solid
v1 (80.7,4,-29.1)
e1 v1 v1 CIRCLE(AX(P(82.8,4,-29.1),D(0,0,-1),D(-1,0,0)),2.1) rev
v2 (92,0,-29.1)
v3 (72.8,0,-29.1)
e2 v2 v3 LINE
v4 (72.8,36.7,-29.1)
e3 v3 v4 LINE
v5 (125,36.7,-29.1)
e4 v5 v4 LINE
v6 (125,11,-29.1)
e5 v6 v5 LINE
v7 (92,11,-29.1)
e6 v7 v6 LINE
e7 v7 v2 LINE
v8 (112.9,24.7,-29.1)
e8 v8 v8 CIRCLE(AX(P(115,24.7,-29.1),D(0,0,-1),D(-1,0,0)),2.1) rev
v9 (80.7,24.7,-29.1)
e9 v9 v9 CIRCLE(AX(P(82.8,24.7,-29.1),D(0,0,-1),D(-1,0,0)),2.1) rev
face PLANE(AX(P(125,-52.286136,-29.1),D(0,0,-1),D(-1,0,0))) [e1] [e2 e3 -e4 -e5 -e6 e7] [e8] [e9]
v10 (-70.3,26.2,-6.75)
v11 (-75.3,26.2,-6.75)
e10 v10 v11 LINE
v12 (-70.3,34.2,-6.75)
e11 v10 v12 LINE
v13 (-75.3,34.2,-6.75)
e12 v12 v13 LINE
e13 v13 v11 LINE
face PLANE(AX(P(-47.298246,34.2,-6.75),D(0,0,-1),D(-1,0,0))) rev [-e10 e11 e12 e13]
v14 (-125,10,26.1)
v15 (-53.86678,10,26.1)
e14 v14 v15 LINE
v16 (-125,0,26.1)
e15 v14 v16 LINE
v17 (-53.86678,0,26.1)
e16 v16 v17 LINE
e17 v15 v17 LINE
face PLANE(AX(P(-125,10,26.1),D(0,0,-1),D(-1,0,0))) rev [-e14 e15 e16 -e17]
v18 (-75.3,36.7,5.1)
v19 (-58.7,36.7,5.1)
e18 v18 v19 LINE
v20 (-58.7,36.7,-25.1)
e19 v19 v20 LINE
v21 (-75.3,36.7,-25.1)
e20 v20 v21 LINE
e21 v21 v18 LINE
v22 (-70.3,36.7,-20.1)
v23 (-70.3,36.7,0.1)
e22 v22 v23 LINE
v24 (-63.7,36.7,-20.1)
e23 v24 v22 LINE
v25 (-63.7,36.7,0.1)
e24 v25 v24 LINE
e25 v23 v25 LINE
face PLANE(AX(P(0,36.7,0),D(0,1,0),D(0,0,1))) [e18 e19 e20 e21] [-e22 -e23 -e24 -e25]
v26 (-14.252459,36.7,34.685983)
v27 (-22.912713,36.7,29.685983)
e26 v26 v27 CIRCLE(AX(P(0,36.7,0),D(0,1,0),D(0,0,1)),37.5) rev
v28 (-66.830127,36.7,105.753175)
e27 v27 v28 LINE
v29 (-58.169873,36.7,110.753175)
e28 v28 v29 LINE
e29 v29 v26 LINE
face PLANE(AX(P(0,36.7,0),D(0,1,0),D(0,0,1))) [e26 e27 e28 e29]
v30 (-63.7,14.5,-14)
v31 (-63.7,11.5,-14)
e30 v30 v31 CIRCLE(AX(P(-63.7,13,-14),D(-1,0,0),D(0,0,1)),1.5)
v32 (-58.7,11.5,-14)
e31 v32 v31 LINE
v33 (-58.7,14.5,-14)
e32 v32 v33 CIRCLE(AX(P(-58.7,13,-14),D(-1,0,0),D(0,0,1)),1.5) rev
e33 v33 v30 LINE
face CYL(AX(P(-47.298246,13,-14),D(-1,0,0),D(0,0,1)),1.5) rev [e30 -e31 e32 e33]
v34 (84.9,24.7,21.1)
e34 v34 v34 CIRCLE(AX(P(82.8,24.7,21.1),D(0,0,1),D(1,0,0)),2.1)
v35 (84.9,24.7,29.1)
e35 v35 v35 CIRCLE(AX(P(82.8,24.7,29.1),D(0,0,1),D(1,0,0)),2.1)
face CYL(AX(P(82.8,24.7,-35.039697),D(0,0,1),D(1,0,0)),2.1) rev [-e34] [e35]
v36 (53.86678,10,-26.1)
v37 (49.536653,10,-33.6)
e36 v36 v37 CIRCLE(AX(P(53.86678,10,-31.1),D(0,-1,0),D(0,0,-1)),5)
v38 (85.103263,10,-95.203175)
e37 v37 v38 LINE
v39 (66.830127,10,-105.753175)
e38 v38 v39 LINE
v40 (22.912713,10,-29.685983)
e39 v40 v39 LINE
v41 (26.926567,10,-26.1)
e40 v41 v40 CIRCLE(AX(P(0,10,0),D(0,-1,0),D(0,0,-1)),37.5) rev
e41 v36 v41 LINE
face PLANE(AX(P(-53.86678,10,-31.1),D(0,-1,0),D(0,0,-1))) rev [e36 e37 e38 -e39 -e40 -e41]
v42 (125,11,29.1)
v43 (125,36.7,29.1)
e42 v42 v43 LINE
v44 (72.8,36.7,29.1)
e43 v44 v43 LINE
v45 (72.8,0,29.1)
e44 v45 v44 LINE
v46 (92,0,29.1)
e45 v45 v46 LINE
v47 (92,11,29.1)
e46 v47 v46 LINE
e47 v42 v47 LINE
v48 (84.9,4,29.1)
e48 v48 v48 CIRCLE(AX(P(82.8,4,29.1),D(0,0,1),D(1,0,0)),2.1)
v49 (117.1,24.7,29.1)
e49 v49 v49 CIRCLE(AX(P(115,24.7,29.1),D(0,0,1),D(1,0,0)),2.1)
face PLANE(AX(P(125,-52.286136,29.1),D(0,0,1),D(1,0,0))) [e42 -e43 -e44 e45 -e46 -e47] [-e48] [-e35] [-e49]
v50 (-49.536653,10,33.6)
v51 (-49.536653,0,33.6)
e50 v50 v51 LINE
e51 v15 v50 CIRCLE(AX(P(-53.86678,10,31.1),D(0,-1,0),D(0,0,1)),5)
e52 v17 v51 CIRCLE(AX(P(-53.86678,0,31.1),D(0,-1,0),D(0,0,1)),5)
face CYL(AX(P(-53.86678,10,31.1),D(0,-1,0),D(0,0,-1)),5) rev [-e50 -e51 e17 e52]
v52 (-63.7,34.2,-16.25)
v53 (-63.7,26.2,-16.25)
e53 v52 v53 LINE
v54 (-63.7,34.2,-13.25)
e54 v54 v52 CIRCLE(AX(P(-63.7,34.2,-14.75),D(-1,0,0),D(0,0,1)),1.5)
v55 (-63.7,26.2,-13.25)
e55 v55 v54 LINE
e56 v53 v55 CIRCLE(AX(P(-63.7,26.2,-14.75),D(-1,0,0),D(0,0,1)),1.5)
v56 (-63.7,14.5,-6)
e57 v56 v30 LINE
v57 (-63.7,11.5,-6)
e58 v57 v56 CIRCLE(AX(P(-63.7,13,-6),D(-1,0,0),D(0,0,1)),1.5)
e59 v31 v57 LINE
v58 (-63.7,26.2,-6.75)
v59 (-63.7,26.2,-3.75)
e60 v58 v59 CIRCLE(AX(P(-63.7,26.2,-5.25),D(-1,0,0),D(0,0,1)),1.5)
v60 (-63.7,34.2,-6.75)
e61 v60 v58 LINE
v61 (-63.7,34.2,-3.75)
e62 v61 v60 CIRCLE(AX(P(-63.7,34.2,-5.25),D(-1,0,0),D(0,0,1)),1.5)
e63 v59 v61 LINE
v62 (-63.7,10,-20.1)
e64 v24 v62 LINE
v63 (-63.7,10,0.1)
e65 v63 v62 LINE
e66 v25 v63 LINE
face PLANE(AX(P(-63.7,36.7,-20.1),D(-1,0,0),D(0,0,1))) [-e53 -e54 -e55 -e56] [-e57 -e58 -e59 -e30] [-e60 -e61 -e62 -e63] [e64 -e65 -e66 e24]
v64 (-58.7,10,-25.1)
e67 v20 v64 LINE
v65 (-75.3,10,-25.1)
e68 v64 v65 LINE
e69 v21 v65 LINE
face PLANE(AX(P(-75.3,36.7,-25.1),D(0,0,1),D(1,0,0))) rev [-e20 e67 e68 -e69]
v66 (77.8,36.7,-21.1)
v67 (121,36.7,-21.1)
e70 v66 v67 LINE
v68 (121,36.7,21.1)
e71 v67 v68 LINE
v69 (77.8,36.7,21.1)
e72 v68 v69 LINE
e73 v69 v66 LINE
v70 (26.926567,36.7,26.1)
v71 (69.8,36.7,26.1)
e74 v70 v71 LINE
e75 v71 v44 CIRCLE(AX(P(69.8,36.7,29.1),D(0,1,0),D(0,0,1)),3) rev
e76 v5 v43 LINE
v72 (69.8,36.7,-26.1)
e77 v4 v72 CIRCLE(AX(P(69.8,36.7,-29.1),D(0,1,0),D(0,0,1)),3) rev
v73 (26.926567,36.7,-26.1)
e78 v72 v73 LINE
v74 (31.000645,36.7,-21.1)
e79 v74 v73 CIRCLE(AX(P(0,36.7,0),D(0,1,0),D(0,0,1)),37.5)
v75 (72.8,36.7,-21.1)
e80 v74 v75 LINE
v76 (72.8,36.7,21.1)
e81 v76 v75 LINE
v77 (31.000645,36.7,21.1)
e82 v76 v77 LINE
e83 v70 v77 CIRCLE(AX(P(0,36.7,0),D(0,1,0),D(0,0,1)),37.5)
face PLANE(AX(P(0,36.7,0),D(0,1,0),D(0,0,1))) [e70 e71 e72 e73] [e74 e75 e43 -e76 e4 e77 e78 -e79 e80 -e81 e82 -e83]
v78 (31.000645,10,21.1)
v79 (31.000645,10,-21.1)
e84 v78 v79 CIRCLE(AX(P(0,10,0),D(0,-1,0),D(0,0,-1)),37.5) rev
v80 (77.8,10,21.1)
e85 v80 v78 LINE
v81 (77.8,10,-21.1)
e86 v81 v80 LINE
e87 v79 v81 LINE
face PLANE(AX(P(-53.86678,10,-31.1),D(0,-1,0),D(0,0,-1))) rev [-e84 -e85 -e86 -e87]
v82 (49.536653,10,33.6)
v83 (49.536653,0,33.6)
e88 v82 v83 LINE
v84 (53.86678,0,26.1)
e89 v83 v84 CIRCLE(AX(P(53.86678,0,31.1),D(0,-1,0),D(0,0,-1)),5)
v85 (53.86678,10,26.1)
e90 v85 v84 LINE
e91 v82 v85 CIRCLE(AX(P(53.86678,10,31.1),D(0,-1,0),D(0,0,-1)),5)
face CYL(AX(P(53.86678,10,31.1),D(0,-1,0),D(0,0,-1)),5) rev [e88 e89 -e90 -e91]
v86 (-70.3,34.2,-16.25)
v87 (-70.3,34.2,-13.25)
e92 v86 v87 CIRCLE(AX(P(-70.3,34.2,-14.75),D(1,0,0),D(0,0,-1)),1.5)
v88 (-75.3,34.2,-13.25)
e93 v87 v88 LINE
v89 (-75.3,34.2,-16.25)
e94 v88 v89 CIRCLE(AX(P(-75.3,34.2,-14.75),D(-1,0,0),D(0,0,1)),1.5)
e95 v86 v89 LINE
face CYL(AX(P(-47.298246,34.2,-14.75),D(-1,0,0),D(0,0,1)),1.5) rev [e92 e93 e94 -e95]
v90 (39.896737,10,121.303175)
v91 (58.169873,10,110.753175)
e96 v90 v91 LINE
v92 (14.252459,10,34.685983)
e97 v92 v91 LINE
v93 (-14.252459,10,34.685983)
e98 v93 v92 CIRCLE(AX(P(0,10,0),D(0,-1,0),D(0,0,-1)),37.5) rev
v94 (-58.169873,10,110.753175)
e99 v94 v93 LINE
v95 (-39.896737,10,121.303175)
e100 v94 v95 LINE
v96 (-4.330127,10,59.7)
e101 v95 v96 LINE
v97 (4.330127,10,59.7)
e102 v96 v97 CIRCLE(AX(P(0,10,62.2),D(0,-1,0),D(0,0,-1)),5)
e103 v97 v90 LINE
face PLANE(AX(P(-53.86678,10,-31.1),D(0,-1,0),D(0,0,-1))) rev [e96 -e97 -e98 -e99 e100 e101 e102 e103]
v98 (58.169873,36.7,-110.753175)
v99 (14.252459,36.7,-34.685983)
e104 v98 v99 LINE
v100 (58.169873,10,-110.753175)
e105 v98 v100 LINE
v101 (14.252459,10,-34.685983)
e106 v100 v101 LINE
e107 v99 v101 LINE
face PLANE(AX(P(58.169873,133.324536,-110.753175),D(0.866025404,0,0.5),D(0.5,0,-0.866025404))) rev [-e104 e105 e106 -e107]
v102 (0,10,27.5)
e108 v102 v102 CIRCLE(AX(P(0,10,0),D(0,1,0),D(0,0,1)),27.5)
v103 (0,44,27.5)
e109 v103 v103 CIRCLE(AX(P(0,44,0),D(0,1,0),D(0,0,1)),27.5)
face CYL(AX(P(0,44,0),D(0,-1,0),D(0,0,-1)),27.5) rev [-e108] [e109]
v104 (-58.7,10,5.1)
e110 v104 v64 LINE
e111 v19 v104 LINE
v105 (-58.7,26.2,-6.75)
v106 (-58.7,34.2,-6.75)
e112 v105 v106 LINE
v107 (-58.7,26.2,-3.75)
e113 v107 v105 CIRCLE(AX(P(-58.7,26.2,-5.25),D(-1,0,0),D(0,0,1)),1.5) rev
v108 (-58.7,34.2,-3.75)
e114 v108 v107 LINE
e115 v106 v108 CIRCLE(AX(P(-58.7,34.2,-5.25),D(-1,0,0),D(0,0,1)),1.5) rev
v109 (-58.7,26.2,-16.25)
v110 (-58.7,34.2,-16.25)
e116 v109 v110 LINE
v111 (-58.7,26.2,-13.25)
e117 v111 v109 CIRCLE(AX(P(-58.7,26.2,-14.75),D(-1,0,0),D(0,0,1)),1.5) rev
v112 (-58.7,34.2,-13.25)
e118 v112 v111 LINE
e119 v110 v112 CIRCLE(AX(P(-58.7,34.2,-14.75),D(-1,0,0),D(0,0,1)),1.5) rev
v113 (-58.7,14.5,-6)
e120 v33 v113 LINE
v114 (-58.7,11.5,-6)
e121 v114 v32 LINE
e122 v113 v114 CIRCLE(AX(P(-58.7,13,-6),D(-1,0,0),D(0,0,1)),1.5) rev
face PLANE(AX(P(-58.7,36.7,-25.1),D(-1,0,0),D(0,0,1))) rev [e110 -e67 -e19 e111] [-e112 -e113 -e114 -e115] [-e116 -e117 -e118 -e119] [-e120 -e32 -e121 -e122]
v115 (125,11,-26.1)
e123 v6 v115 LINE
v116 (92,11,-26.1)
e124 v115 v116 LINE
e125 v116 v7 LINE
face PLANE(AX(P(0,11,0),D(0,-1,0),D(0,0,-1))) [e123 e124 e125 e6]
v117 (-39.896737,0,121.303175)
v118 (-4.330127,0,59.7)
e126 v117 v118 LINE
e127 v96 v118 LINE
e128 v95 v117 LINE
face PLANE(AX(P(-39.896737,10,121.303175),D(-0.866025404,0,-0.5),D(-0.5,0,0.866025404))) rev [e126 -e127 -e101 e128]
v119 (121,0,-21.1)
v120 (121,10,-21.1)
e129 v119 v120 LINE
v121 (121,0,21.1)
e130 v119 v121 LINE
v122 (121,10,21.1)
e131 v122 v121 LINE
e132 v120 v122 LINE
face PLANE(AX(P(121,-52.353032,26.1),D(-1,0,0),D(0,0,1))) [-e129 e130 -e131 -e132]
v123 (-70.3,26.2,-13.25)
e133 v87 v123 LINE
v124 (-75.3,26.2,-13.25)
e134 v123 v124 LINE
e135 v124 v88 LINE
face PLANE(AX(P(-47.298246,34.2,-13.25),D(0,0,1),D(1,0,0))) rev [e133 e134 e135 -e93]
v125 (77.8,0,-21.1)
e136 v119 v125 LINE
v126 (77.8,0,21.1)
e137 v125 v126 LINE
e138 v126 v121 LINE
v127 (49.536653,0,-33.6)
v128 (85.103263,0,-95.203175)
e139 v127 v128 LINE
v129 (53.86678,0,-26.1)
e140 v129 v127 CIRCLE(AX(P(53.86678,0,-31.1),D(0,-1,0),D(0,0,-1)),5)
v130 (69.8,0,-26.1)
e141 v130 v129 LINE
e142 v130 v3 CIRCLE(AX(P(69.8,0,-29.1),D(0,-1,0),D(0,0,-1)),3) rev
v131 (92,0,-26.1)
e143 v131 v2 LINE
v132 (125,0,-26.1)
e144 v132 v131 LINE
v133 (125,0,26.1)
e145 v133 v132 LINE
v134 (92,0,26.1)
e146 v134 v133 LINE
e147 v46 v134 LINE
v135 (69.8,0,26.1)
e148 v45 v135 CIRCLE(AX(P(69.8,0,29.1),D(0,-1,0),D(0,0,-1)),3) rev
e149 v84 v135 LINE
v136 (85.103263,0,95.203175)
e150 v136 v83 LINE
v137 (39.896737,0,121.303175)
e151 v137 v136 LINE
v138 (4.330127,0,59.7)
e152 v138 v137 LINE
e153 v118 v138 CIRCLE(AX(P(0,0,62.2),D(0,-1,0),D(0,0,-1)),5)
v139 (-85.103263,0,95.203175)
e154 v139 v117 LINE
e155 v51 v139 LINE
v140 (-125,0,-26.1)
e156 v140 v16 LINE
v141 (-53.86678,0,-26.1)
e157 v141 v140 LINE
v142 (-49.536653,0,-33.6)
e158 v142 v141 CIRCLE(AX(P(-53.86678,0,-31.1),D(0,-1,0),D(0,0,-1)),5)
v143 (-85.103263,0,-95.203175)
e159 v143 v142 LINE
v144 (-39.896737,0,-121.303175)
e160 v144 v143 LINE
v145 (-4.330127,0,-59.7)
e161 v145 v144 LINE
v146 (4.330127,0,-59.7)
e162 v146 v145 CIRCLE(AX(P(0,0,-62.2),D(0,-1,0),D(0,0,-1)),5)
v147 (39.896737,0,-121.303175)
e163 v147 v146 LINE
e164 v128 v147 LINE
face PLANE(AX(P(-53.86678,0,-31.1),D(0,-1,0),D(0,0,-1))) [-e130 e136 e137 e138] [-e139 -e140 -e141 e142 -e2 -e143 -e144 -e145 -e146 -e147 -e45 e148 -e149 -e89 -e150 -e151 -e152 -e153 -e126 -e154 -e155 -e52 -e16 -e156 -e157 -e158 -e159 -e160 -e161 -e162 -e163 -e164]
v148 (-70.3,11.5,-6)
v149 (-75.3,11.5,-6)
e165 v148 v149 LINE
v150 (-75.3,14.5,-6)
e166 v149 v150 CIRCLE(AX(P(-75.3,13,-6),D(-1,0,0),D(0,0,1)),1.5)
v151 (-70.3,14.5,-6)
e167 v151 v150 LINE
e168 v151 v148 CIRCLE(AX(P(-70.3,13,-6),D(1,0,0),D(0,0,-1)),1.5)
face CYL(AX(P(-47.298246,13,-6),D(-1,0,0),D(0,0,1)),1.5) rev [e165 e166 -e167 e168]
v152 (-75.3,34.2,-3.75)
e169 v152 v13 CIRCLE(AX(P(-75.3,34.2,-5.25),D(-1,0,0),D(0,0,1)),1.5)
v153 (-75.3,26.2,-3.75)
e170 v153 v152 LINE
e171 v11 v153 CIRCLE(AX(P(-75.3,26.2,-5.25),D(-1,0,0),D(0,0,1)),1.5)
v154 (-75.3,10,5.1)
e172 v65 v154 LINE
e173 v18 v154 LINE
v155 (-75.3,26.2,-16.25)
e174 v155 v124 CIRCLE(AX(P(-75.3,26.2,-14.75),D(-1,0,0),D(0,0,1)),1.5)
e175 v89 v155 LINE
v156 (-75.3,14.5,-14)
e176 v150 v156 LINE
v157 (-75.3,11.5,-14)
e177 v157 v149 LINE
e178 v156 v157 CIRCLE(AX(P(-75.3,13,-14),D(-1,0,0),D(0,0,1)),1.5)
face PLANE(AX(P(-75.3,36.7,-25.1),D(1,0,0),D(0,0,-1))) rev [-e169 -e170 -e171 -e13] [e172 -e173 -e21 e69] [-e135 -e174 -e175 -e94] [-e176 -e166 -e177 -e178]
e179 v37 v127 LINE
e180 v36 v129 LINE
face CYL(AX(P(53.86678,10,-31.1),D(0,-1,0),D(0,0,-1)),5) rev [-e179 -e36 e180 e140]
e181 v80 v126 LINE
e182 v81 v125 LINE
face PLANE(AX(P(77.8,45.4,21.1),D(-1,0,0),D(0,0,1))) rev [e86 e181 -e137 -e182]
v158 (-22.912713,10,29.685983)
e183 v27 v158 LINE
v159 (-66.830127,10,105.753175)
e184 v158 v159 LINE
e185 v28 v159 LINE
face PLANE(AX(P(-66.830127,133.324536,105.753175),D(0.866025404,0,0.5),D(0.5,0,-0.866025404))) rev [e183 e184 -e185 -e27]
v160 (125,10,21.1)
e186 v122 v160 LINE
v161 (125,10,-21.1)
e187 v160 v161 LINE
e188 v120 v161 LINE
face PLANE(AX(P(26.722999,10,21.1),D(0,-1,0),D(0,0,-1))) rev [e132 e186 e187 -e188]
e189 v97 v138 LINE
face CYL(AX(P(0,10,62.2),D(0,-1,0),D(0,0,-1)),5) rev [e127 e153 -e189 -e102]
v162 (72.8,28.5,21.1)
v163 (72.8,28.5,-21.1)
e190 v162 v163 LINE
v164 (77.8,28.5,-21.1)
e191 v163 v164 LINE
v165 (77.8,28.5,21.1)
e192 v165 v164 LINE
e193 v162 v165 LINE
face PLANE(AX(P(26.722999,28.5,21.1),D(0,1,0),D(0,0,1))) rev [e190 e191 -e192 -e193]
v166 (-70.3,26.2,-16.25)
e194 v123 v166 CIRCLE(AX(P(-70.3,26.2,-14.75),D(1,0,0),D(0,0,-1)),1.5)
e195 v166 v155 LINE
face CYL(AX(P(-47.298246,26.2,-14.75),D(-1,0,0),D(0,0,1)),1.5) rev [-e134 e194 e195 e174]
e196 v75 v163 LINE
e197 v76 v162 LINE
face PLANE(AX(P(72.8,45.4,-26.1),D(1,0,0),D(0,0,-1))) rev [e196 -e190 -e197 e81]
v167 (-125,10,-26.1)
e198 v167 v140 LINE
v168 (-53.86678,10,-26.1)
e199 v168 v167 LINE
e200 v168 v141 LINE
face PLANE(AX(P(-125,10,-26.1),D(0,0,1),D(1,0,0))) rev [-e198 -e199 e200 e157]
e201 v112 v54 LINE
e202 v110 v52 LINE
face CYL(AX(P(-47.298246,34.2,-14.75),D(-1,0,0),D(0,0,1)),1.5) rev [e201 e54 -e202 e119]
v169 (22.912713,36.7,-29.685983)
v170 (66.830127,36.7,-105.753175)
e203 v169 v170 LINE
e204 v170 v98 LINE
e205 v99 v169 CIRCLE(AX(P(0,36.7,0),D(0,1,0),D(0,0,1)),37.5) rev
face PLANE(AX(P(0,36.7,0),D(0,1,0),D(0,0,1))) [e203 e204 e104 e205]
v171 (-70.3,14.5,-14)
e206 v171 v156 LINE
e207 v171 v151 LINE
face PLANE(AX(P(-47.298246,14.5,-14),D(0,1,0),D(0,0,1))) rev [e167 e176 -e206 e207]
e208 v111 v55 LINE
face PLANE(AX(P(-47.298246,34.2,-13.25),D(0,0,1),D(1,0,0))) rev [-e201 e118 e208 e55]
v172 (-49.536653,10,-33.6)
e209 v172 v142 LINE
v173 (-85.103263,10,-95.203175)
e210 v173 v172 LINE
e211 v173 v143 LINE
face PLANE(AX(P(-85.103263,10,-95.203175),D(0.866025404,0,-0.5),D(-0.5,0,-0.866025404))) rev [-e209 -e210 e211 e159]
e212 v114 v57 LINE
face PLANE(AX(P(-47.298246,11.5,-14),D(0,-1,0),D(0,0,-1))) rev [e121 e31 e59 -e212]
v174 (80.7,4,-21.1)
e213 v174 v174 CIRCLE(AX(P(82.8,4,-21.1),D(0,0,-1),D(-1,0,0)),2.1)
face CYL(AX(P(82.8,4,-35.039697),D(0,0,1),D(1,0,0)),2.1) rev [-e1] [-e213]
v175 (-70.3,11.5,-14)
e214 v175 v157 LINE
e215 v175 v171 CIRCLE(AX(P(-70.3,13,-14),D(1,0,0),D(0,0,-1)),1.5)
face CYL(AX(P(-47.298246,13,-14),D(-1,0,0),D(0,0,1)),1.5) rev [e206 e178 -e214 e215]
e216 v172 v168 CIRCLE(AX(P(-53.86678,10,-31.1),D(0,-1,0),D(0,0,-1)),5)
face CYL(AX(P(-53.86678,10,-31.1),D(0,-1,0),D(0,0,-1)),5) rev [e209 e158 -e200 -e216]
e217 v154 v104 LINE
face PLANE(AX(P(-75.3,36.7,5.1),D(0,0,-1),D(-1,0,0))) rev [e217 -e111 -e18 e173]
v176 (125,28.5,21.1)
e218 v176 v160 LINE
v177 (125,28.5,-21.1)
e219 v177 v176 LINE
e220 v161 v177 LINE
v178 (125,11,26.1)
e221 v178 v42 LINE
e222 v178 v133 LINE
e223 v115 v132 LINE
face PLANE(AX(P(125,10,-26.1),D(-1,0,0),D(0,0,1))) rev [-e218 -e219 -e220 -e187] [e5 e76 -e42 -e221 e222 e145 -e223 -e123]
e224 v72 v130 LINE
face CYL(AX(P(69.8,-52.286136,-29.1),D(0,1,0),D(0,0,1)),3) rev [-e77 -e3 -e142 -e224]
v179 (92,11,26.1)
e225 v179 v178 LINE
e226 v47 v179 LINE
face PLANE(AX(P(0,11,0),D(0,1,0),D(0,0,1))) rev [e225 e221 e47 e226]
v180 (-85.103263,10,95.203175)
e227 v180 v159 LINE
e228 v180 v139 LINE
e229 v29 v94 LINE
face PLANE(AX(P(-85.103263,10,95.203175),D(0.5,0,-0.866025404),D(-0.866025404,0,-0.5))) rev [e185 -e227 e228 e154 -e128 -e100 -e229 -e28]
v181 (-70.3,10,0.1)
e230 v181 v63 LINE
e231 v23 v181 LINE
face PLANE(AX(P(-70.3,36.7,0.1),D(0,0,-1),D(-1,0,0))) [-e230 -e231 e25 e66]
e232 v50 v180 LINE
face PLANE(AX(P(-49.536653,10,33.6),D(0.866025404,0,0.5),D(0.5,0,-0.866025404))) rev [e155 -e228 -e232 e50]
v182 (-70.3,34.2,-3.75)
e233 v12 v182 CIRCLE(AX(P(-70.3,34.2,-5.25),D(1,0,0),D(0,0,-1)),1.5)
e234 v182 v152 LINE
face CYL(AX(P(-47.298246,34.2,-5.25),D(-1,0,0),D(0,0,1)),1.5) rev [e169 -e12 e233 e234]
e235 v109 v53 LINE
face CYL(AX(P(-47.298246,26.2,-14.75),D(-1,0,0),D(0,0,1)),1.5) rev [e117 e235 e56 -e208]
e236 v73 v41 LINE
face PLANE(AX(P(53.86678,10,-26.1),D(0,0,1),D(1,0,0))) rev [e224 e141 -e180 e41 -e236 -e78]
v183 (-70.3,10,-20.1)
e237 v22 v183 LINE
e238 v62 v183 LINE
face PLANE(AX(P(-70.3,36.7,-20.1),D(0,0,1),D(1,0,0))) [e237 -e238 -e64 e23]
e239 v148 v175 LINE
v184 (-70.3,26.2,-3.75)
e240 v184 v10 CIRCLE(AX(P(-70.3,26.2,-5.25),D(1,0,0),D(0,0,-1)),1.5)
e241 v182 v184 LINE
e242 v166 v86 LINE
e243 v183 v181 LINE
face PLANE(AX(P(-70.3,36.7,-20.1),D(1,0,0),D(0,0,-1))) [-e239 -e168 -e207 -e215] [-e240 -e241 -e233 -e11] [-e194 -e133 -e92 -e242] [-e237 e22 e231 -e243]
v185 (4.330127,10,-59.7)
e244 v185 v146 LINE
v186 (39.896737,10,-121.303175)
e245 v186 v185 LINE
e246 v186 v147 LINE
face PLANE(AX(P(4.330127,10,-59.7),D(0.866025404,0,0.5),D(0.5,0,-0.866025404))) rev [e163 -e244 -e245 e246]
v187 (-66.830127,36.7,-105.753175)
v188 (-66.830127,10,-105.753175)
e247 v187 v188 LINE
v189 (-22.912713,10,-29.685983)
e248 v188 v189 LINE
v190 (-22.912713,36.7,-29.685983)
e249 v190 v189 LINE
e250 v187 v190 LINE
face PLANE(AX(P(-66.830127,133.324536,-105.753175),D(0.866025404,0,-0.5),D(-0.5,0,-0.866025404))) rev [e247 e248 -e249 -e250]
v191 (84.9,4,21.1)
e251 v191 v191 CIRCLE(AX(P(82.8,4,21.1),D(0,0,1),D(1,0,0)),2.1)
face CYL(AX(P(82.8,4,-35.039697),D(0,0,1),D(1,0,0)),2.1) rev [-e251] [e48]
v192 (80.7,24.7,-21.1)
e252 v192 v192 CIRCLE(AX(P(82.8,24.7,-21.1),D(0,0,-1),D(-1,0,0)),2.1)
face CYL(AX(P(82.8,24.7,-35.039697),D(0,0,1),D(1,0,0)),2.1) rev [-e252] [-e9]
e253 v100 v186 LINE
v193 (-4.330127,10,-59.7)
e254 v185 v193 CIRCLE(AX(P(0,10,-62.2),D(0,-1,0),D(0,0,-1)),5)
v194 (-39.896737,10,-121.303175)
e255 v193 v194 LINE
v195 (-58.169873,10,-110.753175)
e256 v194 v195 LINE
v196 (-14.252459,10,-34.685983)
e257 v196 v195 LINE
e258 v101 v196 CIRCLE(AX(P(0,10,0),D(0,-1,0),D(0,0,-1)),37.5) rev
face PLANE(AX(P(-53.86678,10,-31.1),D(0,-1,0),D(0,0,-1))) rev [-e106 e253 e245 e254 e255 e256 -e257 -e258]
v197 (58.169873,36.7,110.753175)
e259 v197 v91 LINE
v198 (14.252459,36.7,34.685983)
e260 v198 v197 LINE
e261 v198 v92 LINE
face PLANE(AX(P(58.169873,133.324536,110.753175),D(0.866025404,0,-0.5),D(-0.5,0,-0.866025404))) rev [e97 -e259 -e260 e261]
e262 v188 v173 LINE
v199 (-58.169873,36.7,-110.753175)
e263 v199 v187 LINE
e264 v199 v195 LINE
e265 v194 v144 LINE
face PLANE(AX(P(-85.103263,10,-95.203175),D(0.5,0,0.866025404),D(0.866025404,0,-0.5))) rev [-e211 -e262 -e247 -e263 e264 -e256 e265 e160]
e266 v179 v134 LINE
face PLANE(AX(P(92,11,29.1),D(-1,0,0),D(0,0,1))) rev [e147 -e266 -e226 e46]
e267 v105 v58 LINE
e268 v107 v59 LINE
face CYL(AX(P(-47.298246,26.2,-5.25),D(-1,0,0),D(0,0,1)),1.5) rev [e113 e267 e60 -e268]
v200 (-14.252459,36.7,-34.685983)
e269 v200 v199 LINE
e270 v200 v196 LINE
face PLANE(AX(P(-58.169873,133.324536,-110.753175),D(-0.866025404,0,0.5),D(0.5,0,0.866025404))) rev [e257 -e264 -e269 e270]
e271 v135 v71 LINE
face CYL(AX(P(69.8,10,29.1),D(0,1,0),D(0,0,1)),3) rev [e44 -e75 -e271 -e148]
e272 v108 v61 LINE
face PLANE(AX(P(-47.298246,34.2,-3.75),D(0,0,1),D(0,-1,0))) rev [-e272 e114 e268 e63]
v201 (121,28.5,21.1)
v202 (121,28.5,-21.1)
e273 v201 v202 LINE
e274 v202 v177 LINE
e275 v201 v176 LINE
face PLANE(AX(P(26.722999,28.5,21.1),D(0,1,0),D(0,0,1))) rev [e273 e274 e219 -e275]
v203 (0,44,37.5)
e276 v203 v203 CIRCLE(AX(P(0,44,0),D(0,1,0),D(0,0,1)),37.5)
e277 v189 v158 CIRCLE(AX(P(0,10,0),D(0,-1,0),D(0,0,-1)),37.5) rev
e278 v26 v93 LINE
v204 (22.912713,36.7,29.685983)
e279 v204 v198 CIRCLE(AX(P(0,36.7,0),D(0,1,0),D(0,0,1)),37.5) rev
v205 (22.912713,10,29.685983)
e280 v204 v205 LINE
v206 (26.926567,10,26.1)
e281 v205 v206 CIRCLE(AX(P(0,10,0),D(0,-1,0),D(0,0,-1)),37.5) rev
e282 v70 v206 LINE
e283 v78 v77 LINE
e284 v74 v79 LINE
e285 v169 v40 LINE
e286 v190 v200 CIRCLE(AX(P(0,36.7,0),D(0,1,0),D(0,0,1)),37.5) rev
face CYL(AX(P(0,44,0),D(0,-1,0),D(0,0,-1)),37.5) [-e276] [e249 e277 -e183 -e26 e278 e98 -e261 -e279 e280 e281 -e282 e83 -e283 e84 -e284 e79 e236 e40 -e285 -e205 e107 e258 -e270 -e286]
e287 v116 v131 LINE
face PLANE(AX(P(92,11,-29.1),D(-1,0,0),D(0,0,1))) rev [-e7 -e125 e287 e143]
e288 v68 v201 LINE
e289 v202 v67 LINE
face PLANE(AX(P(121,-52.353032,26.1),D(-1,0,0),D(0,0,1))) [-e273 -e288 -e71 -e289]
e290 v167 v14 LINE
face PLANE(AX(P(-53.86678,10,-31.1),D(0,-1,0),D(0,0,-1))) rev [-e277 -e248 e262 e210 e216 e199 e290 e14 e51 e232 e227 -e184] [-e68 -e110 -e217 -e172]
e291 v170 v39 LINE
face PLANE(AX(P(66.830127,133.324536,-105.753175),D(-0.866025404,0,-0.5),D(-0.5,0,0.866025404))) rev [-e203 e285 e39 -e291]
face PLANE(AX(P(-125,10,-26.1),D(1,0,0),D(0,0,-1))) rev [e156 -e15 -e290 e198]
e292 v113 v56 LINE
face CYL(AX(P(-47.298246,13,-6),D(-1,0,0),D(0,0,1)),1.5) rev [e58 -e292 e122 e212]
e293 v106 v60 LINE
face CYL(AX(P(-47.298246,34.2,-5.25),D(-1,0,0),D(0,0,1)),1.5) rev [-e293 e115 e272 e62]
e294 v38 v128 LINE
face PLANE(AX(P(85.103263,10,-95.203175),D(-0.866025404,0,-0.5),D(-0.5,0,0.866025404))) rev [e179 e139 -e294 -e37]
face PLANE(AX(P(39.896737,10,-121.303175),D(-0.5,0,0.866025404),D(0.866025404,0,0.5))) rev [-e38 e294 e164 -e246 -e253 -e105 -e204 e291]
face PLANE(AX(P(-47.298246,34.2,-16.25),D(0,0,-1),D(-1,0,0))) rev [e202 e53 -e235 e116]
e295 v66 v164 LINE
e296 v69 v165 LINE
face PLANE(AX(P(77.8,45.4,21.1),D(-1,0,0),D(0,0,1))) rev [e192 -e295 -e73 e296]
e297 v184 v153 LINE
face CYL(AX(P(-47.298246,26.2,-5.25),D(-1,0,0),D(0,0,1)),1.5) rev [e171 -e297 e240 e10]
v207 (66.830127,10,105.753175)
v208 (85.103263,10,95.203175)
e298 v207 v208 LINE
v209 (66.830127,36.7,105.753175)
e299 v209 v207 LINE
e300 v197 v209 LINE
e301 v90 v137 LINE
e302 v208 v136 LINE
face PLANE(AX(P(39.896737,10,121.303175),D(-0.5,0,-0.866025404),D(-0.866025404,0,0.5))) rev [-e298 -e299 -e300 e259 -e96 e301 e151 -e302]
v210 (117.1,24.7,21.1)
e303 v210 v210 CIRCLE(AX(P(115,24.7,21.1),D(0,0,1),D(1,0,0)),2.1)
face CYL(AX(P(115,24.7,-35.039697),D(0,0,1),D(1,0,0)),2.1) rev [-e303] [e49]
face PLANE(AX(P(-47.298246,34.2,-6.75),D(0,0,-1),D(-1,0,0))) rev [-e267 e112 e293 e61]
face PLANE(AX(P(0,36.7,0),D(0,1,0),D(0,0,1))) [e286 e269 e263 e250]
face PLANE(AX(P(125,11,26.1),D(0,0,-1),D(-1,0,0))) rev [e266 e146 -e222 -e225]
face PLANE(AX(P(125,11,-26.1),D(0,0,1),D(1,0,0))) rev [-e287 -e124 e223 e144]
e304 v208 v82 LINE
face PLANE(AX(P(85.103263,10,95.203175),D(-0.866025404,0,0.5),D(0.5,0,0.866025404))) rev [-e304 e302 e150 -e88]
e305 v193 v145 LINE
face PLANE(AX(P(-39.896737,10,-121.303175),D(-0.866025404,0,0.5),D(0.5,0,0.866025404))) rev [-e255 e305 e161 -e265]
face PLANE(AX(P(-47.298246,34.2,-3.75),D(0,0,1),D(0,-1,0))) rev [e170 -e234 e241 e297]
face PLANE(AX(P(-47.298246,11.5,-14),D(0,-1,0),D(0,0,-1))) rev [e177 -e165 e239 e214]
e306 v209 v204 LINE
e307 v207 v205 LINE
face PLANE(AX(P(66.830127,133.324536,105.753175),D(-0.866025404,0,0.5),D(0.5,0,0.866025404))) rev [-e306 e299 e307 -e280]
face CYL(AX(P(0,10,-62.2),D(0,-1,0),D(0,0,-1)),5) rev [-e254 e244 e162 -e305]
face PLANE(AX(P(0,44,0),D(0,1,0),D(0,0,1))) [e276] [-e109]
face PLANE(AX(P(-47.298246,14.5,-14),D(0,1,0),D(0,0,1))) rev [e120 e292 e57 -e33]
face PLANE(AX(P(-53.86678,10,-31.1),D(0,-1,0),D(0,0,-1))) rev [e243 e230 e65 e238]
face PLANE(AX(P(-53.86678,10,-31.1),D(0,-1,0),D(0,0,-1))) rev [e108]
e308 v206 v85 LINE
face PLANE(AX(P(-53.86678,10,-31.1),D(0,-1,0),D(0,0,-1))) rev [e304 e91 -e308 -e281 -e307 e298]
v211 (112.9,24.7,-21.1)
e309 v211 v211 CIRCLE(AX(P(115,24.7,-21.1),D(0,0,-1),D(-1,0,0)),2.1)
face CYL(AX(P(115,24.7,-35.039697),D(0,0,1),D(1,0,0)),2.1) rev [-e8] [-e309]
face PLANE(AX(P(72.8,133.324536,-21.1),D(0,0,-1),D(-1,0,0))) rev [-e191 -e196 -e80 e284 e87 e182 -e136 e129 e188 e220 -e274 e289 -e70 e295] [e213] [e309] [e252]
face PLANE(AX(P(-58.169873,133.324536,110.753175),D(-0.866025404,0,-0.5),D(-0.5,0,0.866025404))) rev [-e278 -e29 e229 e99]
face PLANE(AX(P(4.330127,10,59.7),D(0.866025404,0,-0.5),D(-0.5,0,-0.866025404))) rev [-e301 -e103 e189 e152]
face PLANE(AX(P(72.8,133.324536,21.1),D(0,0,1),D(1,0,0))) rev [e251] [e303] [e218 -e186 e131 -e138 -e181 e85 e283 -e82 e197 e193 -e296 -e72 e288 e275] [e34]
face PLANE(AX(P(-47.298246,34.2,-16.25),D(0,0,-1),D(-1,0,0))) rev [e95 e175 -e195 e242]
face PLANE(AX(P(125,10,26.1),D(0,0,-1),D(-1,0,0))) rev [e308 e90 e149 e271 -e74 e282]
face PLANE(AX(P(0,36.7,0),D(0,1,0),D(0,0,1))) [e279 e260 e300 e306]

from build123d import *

# Parameters (mm, degrees)
AUFSATZ_LINEAR_AUSTRAGEN1_DEPTH  = 10
SKIZZE2_R                        = 37.5
SKIZZE2_R_2                      = 27.5
AUFSATZ_LINEAR_AUSTRAGEN2_DEPTH  = 34
AUFSATZ_LINEAR_AUSTRAGEN3_DEPTH  = 35.4
SKIZZE4_W                        = 47.2
SKIZZE4_H                        = 42.2
SCHNITT_LINEAR_AUSTRAGEN1_DEPTH  = 178.743130331
SKIZZE8_W                        = 16.6
SKIZZE8_H                        = 30.2
SKIZZE8_W_2                      = 6.6
SKIZZE8_H_2                      = 20.2
AUFSATZ_LINEAR_AUSTRAGEN4_DEPTH  = 26.7
SCHNITT_LINEAR_AUSTRAGEN6_REACH  = 240.528
SKIZZE11_W                       = 45.873433193
SKIZZE11_H                       = 5
AUFSATZ_LINEAR_AUSTRAGEN5_DEPTH  = 26.7
SKIZZE12_W                       = 52.2
SKIZZE12_H                       = 52.2
SCHNITT_LINEAR_AUSTRAGEN7_DEPTH  = 8.7
SKIZZE13_W                       = 4
SKIZZE13_H                       = 52.2
AUFSATZ_LINEAR_AUSTRAGEN6_DEPTH  = 36.7
SCHNITT_LINEAR_AUSTRAGEN8_REACH  = 283.337
SKIZZE14_W                       = 42.2
SKIZZE14_H                       = 18.5
SKIZZE15_W                       = 52.2
SKIZZE15_H                       = 3
AUFSATZ_LINEAR_AUSTRAGEN7_DEPTH  = 36.7
VERRUNDUNG1_R                    = 3
SCHNITT_LINEAR_AUSTRAGEN9_REACH  = 202.455
SKIZZE16_R                       = 2.1
SKIZZE17_W                       = 33
SKIZZE17_H                       = 3
SCHNITT_LINEAR_AUSTRAGEN10_DEPTH = 11


with BuildPart() as part:
    # Skizze1 → Aufsatz-Linear austragen1 (new body)
    with BuildSketch(Plane(origin=(0, 0, 0), x_dir=(1, 0, 0), z_dir=(0, 1, 0))):
        with BuildLine():
            Line((-125, 26.1), (-125, -26.1))
            Line((-125, -26.1), (-53.866780115, -26.1))
            ThreePointArc((-53.866780115, -26.1), (-49.536653096, -28.6), (-49.536653096, -33.6))
            Line((-49.536653096, -33.6), (-85.103263039, -95.203175473))
            Line((-85.103263039, -95.203175473), (-39.896736961, -121.303175473))
            Line((-39.896736961, -121.303175473), (-4.330127019, -59.7))
            ThreePointArc((-4.330127019, -59.7), (0, -57.2), (4.330127019, -59.7))
            Line((4.330127019, -59.7), (39.896736961, -121.303175473))
            Line((39.896736961, -121.303175473), (85.103263039, -95.203175473))
            Line((85.103263039, -95.203175473), (49.536653096, -33.6))
            ThreePointArc((49.536653096, -33.6), (49.536653096, -28.6), (53.866780115, -26.1))
            Line((53.866780115, -26.1), (125, -26.1))
            Line((125, -26.1), (125, 26.1))
            Line((125, 26.1), (53.866780115, 26.1))
            ThreePointArc((53.866780115, 26.1), (49.536653096, 28.6), (49.536653096, 33.6))
            Line((49.536653096, 33.6), (85.103263039, 95.203175473))
            Line((85.103263039, 95.203175473), (39.896736961, 121.303175473))
            Line((39.896736961, 121.303175473), (4.330127019, 59.7))
            ThreePointArc((4.330127019, 59.7), (0, 57.2), (-4.330127019, 59.7))
            Line((-4.330127019, 59.7), (-39.896736961, 121.303175473))
            Line((-39.896736961, 121.303175473), (-85.103263039, 95.203175473))
            Line((-85.103263039, 95.203175473), (-49.536653096, 33.6))
            ThreePointArc((-49.536653096, 33.6), (-49.536653096, 28.6), (-53.866780115, 26.1))
            Line((-53.866780115, 26.1), (-125, 26.1))
        make_face()
    extrude(amount=AUFSATZ_LINEAR_AUSTRAGEN1_DEPTH)

    # Skizze2 → Aufsatz-Linear austragen2 (add)
    with BuildSketch(Plane(origin=(0, 10, 0), x_dir=(1, 0, 0), z_dir=(0, 1, 0))):
        with Locations(Location((0, 0, 0), (0, 0, 90))):
            Circle(SKIZZE2_R)
        with Locations(Location((0, 0, 0), (0, 0, 270))):
            Circle(SKIZZE2_R_2, mode=Mode.SUBTRACT)
    extrude(amount=AUFSATZ_LINEAR_AUSTRAGEN2_DEPTH)

    # Skizze3 → Aufsatz-Linear austragen3 (add)
    with BuildSketch(Plane(origin=(0, 10, 0), x_dir=(1, 0, 0), z_dir=(0, 1, 0))):
        Polygon((125, 26.1), (72.8, 26.1), (72.8, -26.1), (125, -26.1), (125, -21.1), (77.8, -21.1), (77.8, 21.1), (125, 21.1), align=None)
    extrude(amount=AUFSATZ_LINEAR_AUSTRAGEN3_DEPTH)

    # Skizze4 → Schnitt-Linear austragen1 (cut, through all)
    with BuildSketch(Plane(origin=(0, 10, 0), x_dir=(1, 0, 0), z_dir=(0, 1, 0))):
        with Locations((101.4, 0)):
            Rectangle(SKIZZE4_W, SKIZZE4_H)
    extrude(amount=-SCHNITT_LINEAR_AUSTRAGEN1_DEPTH, mode=Mode.SUBTRACT)

    # Skizze8 → Aufsatz-Linear austragen4 (add)
    with BuildSketch(Plane(origin=(0, 10, 0), x_dir=(1, 0, 0), z_dir=(0, 1, 0))):
        with Locations((-67, 10)):
            Rectangle(SKIZZE8_W, SKIZZE8_H)
        with Locations((-67, 10)):
            Rectangle(SKIZZE8_W_2, SKIZZE8_H_2, mode=Mode.SUBTRACT)
    extrude(amount=AUFSATZ_LINEAR_AUSTRAGEN4_DEPTH)

    # Schnitt-Linear austragen6: up to this face of the body (flat: up to its plane)
    schnitt_linear_austragen6_end = Plane(part.part.faces().sort_by_distance((-58.7, 23.35, -10))[0])
    # Skizze10 → Schnitt-Linear austragen6 (cut, up to the picked face)
    with BuildSketch(Plane.ZY.offset(75.3), mode=Mode.PRIVATE) as schnitt_linear_austragen6_sk1:
        with BuildLine():
            Line((-13.25, 34.2), (-13.25, 26.2))
            ThreePointArc((-13.25, 26.2), (-14.75, 24.7), (-16.25, 26.2))
            Line((-16.25, 26.2), (-16.25, 34.2))
            ThreePointArc((-16.25, 34.2), (-14.75, 35.7), (-13.25, 34.2))
        make_face()
    schnitt_linear_austragen6_tool1 = split(extrude(schnitt_linear_austragen6_sk1.sketch, amount=-SCHNITT_LINEAR_AUSTRAGEN6_REACH, mode=Mode.PRIVATE), bisect_by=schnitt_linear_austragen6_end, keep=Keep.BOTH, mode=Mode.PRIVATE)
    # Skizze10 → Schnitt-Linear austragen6 (cut, up to the picked face)
    with BuildSketch(Plane.ZY.offset(75.3), mode=Mode.PRIVATE) as schnitt_linear_austragen6_sk2:
        with BuildLine():
            Line((-3.75, 34.2), (-3.75, 26.2))
            ThreePointArc((-3.75, 26.2), (-5.25, 24.7), (-6.75, 26.2))
            Line((-6.75, 26.2), (-6.75, 34.2))
            ThreePointArc((-6.75, 34.2), (-5.25, 35.7), (-3.75, 34.2))
        make_face()
    schnitt_linear_austragen6_tool2 = split(extrude(schnitt_linear_austragen6_sk2.sketch, amount=-SCHNITT_LINEAR_AUSTRAGEN6_REACH, mode=Mode.PRIVATE), bisect_by=schnitt_linear_austragen6_end, keep=Keep.BOTH, mode=Mode.PRIVATE)
    # Skizze10 → Schnitt-Linear austragen6 (cut, up to the picked face)
    with BuildSketch(Plane.ZY.offset(75.3), mode=Mode.PRIVATE) as schnitt_linear_austragen6_sk3:
        with BuildLine():
            Line((-14, 14.5), (-6, 14.5))
            ThreePointArc((-6, 14.5), (-4.5, 13), (-6, 11.5))
            Line((-6, 11.5), (-14, 11.5))
            ThreePointArc((-14, 11.5), (-15.5, 13), (-14, 14.5))
        make_face()
    schnitt_linear_austragen6_tool3 = split(extrude(schnitt_linear_austragen6_sk3.sketch, amount=-SCHNITT_LINEAR_AUSTRAGEN6_REACH, mode=Mode.PRIVATE), bisect_by=schnitt_linear_austragen6_end, keep=Keep.BOTH, mode=Mode.PRIVATE)
    add(schnitt_linear_austragen6_tool1.solids().sort_by(Axis((-75.3, 30.2, -14.75), (1, 0, 0)))[0], mode=Mode.SUBTRACT)
    add(schnitt_linear_austragen6_tool2.solids().sort_by(Axis((-75.3, 30.2, -5.25), (1, 0, 0)))[0], mode=Mode.SUBTRACT)
    add(schnitt_linear_austragen6_tool3.solids().sort_by(Axis((-75.3, 13, -10), (1, 0, 0)))[0], mode=Mode.SUBTRACT)

    # Skizze11 → Aufsatz-Linear austragen5 (add)
    with BuildSketch(Plane(origin=(0, 10, 0), x_dir=(1, 0, 0), z_dir=(0, 1, 0))):
        with BuildLine():
            Line((-66.830127019, 105.753175473), (-58.169872981, 110.753175473))
            Line((-58.169872981, 110.753175473), (-14.252458915, 34.685982974))
            ThreePointArc((-14.252458915, 34.685982974), (-18.75, 32.475952642), (-22.912712953, 29.685982974))
            Line((-22.912712953, 29.685982974), (-66.830127019, 105.753175473))
        make_face()
        with BuildLine():
            Line((58.169872981, 110.753175473), (14.252458915, 34.685982974))
            ThreePointArc((14.252458915, 34.685982974), (18.75, 32.475952642), (22.912712953, 29.685982974))
            Line((22.912712953, 29.685982974), (66.830127019, 105.753175473))
            Line((66.830127019, 105.753175473), (58.169872981, 110.753175473))
        make_face()
        with BuildLine():
            Line((-58.169872981, -110.753175473), (-14.252458915, -34.685982974))
            ThreePointArc((-14.252458915, -34.685982974), (-18.75, -32.475952642), (-22.912712953, -29.685982974))
            Line((-22.912712953, -29.685982974), (-66.830127019, -105.753175473))
            Line((-66.830127019, -105.753175473), (-58.169872981, -110.753175473))
        make_face()
        with BuildLine():
            Line((66.830127019, -105.753175473), (58.169872981, -110.753175473))
            Line((58.169872981, -110.753175473), (14.252458915, -34.685982974))
            ThreePointArc((14.252458915, -34.685982974), (18.75, -32.475952642), (22.912712953, -29.685982974))
            Line((22.912712953, -29.685982974), (66.830127019, -105.753175473))
        make_face()
        with Locations((49.863283404, 23.6)):
            Rectangle(SKIZZE11_W, SKIZZE11_H)
        with Locations((49.863283404, -23.6)):
            Rectangle(SKIZZE11_W, SKIZZE11_H)
    extrude(amount=AUFSATZ_LINEAR_AUSTRAGEN5_DEPTH)

    # Skizze12 → Schnitt-Linear austragen7 (cut)
    with BuildSketch(Plane(origin=(0, 45.4, 0), x_dir=(1, 0, 0), z_dir=(0, 1, 0))):
        with Locations((98.9, 0)):
            Rectangle(SKIZZE12_W, SKIZZE12_H)
    extrude(amount=-SCHNITT_LINEAR_AUSTRAGEN7_DEPTH, mode=Mode.SUBTRACT)

    # Skizze13 → Aufsatz-Linear austragen6 (add)
    with BuildSketch(Plane(origin=(0, 36.7, 0), x_dir=(1, 0, 0), z_dir=(0, 1, 0))):
        with Locations((123, 0)):
            Rectangle(SKIZZE13_W, SKIZZE13_H)
    extrude(amount=-AUFSATZ_LINEAR_AUSTRAGEN6_DEPTH)

    # Schnitt-Linear austragen8: up to this face of the body (flat: up to its plane)
    schnitt_linear_austragen8_end = Plane(part.part.faces().sort_by_distance((72.8, 23.35, 0))[0])
    # Skizze14 → Schnitt-Linear austragen8 (cut, up to the picked face)
    with BuildSketch(Plane(origin=(125, 0, 0), x_dir=(0, 0, -1), z_dir=(1, 0, 0)), mode=Mode.PRIVATE) as schnitt_linear_austragen8_sk1:
        with Locations((0, 19.25)):
            Rectangle(SKIZZE14_W, SKIZZE14_H)
    schnitt_linear_austragen8_tool1 = split(extrude(schnitt_linear_austragen8_sk1.sketch, amount=-SCHNITT_LINEAR_AUSTRAGEN8_REACH, mode=Mode.PRIVATE), bisect_by=schnitt_linear_austragen8_end, keep=Keep.BOTH, mode=Mode.PRIVATE)
    add(schnitt_linear_austragen8_tool1.solids().sort_by(Axis((125, 19.25, 0), (-1, 0, 0)))[0], mode=Mode.SUBTRACT)

    # Skizze15 → Aufsatz-Linear austragen7 (add)
    with BuildSketch(Plane(origin=(0, 36.7, 0), x_dir=(1, 0, 0), z_dir=(0, 1, 0))):
        with Locations((98.9, 27.6)):
            Rectangle(SKIZZE15_W, SKIZZE15_H)
        with Locations((98.9, -27.6)):
            Rectangle(SKIZZE15_W, SKIZZE15_H)
    extrude(amount=-AUFSATZ_LINEAR_AUSTRAGEN7_DEPTH)

    # Verrundung1
    verrundung1_edges = [part.edges().sort_by_distance(p)[0] for p in [
        (72.8, 18.35, -26.1),
        (72.8, 18.35, 26.1),
    ]]
    fillet(verrundung1_edges, radius=VERRUNDUNG1_R - 0.0001)  # a hair under: the kernel refuses the full size

    # Schnitt-Linear austragen9: up to this face of the body (flat: up to its plane)
    schnitt_linear_austragen9_end = Plane(part.part.faces().sort_by_distance((98.9, 18.35, -29.1))[0])
    # Skizze16 → Schnitt-Linear austragen9 (cut, up to the picked face)
    with BuildSketch(Plane.XY.offset(29.1), mode=Mode.PRIVATE) as schnitt_linear_austragen9_sk1:
        with Locations((82.8, 24.7)):
            Circle(SKIZZE16_R)
    schnitt_linear_austragen9_tool1 = split(extrude(schnitt_linear_austragen9_sk1.sketch, amount=-SCHNITT_LINEAR_AUSTRAGEN9_REACH, mode=Mode.PRIVATE), bisect_by=schnitt_linear_austragen9_end, keep=Keep.BOTH, mode=Mode.PRIVATE)
    # Skizze16 → Schnitt-Linear austragen9 (cut, up to the picked face)
    with BuildSketch(Plane.XY.offset(29.1), mode=Mode.PRIVATE) as schnitt_linear_austragen9_sk2:
        with Locations((115, 24.7)):
            Circle(SKIZZE16_R)
    schnitt_linear_austragen9_tool2 = split(extrude(schnitt_linear_austragen9_sk2.sketch, amount=-SCHNITT_LINEAR_AUSTRAGEN9_REACH, mode=Mode.PRIVATE), bisect_by=schnitt_linear_austragen9_end, keep=Keep.BOTH, mode=Mode.PRIVATE)
    # Skizze16 → Schnitt-Linear austragen9 (cut, up to the picked face)
    with BuildSketch(Plane.XY.offset(29.1), mode=Mode.PRIVATE) as schnitt_linear_austragen9_sk3:
        with Locations((82.8, 4)):
            Circle(SKIZZE16_R)
    schnitt_linear_austragen9_tool3 = split(extrude(schnitt_linear_austragen9_sk3.sketch, amount=-SCHNITT_LINEAR_AUSTRAGEN9_REACH, mode=Mode.PRIVATE), bisect_by=schnitt_linear_austragen9_end, keep=Keep.BOTH, mode=Mode.PRIVATE)
    add(schnitt_linear_austragen9_tool1.solids().sort_by(Axis((82.8, 24.7, 29.1), (0, 0, -1)))[0], mode=Mode.SUBTRACT)
    add(schnitt_linear_austragen9_tool2.solids().sort_by(Axis((115, 24.7, 29.1), (0, 0, -1)))[0], mode=Mode.SUBTRACT)
    add(schnitt_linear_austragen9_tool3.solids().sort_by(Axis((82.8, 4, 29.1), (0, 0, -1)))[0], mode=Mode.SUBTRACT)

    # Skizze17 → Schnitt-Linear austragen10 (cut)
    with BuildSketch(Plane.XZ):
        with Locations((108.5, 27.6)):
            Rectangle(SKIZZE17_W, SKIZZE17_H)
        with Locations((108.5, -27.6)):
            Rectangle(SKIZZE17_W, SKIZZE17_H)
    extrude(amount=-SCHNITT_LINEAR_AUSTRAGEN10_DEPTH, mode=Mode.SUBTRACT)


solid = part.part
